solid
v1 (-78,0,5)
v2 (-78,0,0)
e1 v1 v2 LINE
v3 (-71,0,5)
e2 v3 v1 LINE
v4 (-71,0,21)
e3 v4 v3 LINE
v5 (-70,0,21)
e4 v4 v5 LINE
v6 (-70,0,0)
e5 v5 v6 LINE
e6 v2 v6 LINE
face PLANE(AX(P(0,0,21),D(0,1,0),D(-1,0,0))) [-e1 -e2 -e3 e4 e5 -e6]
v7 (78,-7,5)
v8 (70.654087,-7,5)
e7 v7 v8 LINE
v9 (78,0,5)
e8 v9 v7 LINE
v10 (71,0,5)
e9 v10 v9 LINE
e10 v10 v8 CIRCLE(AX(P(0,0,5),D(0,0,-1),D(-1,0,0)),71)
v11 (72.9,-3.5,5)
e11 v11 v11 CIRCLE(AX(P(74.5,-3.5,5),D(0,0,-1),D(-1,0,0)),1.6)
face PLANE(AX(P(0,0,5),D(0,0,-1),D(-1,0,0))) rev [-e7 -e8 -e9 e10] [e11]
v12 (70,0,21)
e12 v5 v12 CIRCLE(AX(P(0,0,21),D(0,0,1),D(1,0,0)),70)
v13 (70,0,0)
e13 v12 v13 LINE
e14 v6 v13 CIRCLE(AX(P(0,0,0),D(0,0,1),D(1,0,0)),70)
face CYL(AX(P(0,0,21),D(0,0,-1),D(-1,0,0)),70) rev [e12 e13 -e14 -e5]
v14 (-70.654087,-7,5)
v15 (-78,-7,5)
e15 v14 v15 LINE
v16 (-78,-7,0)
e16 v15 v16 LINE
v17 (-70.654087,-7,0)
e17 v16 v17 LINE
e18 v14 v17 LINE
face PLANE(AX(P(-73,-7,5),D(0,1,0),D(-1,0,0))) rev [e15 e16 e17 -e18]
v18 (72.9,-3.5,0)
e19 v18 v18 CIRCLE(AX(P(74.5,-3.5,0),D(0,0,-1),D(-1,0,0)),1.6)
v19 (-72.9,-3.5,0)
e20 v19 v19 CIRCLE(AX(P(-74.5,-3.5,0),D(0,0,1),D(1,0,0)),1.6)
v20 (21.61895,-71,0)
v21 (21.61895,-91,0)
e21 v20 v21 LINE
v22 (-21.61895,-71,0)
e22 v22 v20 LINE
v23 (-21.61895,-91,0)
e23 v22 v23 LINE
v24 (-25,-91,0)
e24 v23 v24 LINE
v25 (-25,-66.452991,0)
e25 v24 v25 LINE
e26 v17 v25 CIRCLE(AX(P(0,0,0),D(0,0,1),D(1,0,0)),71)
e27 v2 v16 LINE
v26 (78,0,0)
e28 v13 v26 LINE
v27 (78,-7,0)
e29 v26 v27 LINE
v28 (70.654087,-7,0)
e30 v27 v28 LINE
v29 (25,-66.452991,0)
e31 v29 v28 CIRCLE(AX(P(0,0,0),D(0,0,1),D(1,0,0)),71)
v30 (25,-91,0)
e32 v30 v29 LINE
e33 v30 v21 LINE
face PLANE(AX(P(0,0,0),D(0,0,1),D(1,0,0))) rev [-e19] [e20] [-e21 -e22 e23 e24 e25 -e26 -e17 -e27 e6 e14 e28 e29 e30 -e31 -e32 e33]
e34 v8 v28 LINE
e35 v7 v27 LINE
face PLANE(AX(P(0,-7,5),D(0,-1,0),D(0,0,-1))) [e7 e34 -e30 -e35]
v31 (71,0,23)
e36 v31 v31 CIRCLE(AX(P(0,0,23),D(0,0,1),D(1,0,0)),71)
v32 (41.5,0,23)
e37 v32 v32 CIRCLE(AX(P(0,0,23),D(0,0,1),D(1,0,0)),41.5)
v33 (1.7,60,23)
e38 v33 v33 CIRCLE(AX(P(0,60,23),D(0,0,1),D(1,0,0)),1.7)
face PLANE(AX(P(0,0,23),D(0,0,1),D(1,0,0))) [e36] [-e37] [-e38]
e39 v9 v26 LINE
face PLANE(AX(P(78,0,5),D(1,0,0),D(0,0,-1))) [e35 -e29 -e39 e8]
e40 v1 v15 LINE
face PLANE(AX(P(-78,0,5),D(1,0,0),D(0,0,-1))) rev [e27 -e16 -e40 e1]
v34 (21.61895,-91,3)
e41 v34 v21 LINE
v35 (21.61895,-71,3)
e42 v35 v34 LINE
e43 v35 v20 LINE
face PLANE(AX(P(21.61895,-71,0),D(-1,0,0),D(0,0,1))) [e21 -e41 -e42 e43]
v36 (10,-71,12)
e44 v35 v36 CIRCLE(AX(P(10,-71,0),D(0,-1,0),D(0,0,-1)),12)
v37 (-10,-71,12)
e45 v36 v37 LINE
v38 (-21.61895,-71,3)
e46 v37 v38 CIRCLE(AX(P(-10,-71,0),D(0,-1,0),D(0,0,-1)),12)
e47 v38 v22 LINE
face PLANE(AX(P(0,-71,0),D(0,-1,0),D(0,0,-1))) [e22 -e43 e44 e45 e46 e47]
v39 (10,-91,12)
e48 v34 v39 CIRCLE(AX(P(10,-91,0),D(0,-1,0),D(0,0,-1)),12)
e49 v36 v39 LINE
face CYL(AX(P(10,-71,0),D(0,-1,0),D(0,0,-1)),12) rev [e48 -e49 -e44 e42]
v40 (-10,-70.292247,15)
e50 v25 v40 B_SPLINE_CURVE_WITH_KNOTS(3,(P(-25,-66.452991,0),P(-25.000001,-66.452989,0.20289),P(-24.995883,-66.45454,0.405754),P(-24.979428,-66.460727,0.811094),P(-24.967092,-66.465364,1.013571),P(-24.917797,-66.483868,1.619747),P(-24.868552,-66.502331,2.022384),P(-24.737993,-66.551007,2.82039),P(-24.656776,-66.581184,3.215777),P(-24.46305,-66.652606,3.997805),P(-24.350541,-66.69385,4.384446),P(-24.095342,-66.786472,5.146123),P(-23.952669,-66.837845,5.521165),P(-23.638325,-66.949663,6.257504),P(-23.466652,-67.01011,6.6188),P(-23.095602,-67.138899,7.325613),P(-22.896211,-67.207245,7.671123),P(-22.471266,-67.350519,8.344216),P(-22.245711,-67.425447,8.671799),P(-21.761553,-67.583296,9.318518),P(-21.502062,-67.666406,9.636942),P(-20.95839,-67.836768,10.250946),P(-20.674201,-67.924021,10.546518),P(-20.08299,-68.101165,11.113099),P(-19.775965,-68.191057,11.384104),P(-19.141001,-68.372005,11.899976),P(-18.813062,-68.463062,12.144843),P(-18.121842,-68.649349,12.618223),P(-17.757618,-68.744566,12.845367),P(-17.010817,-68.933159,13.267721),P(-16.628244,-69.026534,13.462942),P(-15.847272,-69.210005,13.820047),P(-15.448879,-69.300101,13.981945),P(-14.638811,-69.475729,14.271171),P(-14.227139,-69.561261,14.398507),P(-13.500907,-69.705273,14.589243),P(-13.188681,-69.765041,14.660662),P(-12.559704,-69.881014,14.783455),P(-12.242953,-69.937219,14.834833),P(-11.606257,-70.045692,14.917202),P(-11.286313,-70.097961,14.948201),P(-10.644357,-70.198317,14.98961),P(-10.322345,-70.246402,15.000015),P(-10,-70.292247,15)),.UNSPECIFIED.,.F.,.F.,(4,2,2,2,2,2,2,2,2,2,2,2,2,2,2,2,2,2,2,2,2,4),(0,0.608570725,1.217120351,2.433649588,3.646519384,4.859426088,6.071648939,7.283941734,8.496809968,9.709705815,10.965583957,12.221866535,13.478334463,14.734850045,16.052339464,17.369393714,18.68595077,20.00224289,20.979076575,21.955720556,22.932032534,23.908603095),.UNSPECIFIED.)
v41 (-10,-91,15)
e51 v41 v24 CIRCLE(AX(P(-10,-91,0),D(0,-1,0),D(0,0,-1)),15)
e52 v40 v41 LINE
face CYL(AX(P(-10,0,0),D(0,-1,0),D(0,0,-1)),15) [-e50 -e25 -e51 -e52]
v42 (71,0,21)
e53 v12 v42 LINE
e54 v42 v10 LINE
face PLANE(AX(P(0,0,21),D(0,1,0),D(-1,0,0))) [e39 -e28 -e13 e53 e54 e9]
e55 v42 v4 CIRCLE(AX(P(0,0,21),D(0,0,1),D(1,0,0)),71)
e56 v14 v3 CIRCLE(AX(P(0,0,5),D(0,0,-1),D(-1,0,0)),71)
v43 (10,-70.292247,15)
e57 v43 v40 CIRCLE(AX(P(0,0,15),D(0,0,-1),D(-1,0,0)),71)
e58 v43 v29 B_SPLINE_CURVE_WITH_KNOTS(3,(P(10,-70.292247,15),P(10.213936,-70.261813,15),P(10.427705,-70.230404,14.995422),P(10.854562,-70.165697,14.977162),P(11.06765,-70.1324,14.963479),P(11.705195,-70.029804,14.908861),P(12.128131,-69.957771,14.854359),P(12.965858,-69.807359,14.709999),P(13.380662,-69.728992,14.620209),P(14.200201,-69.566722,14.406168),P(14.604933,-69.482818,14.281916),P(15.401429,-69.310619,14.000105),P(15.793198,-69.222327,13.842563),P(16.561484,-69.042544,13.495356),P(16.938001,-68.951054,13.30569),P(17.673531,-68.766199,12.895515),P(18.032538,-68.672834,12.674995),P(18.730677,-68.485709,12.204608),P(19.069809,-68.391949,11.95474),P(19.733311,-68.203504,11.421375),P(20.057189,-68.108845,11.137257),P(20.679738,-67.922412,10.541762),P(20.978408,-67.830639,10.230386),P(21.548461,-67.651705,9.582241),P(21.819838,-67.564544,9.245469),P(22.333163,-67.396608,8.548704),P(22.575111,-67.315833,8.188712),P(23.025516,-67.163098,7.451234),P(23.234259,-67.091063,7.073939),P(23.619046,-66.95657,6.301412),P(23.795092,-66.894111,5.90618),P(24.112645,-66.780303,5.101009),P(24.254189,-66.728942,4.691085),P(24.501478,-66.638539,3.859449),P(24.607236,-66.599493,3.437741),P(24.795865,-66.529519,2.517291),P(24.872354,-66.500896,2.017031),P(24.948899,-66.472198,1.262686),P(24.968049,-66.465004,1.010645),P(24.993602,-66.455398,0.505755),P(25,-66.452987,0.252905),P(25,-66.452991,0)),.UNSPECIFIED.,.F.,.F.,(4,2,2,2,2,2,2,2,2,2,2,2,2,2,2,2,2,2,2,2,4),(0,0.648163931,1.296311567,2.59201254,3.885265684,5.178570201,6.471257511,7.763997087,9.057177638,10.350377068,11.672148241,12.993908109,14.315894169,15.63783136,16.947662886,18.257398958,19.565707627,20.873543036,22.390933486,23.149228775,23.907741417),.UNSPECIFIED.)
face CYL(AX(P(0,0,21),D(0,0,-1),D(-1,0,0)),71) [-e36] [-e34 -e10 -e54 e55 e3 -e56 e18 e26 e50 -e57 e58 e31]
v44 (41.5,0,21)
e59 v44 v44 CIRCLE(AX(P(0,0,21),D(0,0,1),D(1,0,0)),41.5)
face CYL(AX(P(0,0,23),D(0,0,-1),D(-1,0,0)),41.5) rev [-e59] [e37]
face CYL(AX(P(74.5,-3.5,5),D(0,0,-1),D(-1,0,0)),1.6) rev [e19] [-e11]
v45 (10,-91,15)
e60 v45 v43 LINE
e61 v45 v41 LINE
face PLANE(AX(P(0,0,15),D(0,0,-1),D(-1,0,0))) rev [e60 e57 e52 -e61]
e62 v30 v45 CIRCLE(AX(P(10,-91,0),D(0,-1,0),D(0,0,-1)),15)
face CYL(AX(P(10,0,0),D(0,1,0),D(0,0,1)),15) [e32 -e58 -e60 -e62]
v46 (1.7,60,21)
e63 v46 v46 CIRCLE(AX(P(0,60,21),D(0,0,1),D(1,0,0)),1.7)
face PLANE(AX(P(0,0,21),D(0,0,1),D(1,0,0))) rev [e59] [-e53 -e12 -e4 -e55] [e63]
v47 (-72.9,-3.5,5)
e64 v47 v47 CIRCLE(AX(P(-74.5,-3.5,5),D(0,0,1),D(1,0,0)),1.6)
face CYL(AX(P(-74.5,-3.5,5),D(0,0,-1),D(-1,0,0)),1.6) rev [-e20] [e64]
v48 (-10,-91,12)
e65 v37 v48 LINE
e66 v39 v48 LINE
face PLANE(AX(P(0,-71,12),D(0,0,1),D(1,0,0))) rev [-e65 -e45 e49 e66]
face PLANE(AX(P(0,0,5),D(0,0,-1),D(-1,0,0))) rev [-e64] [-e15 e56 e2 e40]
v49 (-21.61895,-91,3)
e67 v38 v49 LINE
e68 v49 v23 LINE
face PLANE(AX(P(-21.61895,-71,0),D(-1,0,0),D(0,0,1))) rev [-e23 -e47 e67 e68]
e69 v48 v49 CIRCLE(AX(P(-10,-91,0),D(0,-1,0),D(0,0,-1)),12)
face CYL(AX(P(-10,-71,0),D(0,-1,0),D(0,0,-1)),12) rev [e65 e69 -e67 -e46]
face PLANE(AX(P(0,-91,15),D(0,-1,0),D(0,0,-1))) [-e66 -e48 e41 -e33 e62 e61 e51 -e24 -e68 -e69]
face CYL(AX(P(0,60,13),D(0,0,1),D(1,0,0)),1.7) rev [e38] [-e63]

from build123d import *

# Parameters (mm, degrees)
BOSS_EXTRUDE1_DEPTH = 21
SKETCH2_R           = 71
SKETCH2_R_2         = 41.5
BOSS_EXTRUDE2_DEPTH = 2
SKETCH3_W           = 50
SKETCH3_H           = 20
BOSS_EXTRUDE3_DEPTH = 15
SKETCH8_R           = 1.6
BOSS_EXTRUDE5_DEPTH = 5
FILLET2_R           = 15
SKETCH11_W          = 43.237900078
SKETCH11_H          = 3
CUT_EXTRUDE7_DEPTH  = 20
SKETCH12_R          = 1.7
CUT_EXTRUDE8_DEPTH  = 10


with BuildPart() as part:
    # Sketch1 → Boss-Extrude1 (new body)
    with BuildSketch(Plane.XY):
        with BuildLine():
            Line((71, 0), (70, 0))
            ThreePointArc((70, 0), (0, -70), (-70, 0))
            Line((-70, 0), (-71, 0))
            ThreePointArc((-71, 0), (0, -71), (71, 0))
        make_face()
    extrude(amount=BOSS_EXTRUDE1_DEPTH)

    # Sketch2 → Boss-Extrude2 (add)
    with BuildSketch(Plane.XY.offset(21)):
        Circle(SKETCH2_R)
        Circle(SKETCH2_R_2, mode=Mode.SUBTRACT)
    extrude(amount=BOSS_EXTRUDE2_DEPTH)

    # Sketch3 → Boss-Extrude3 (add)
    with BuildSketch(Plane(origin=(0, 0, 0), x_dir=(-1, 0, 0), z_dir=(0, 0, -1))):
        with BuildLine():
            Line((-25, -66.452990903), (-25, -71))
            Line((-25, -71), (0, -71))
            ThreePointArc((0, -71), (-12.705070757, -69.853999006), (-25, -66.452990903))
        make_face()
        with BuildLine():
            ThreePointArc((25, -66.452990903), (12.705070757, -69.853999006), (0, -71))
            Line((0, -71), (25, -71))
            Line((25, -71), (25, -66.452990903))
        make_face()
        with Locations((0, -81)):
            Rectangle(SKETCH3_W, SKETCH3_H)
    extrude(amount=-BOSS_EXTRUDE3_DEPTH)

    # Sketch8 → Boss-Extrude5 (add)
    # profile 1 of 2: a face of its own
    with BuildSketch(Plane(origin=(0, 0, 0), x_dir=(-1, 0, 0), z_dir=(0, 0, -1))):
        with BuildLine():
            ThreePointArc((-70.654086931, -7), (-70.913469003, -3.504270818), (-71, 0))
            Line((-71, 0), (-78, 0))
            Line((-78, 0), (-78, -7))
            Line((-78, -7), (-70.654086931, -7))
        make_face()
        with Locations((-74.5, -3.5)):
            Circle(SKETCH8_R, mode=Mode.SUBTRACT)
    # profile 2 of 2: a face of its own
    with BuildSketch(Plane(origin=(0, 0, 0), x_dir=(-1, 0, 0), z_dir=(0, 0, -1))):
        with BuildLine():
            Line((78, 0), (71, 0))
            ThreePointArc((71, 0), (70.913469003, -3.504270818), (70.654086931, -7))
            Line((70.654086931, -7), (78, -7))
            Line((78, -7), (78, 0))
        make_face()
        with Locations(Location((74.5, -3.5, 0), (0, 0, 180))):
            Circle(SKETCH8_R, mode=Mode.SUBTRACT)
    extrude(amount=-BOSS_EXTRUDE5_DEPTH)

    # Fillet2
    fillet2_edges = [part.edges().sort_by_distance(p)[0] for p in [
        (-25, -78.726495452, 15),
        (25, -78.726495452, 15),
    ]]
    fillet(fillet2_edges, radius=FILLET2_R - 0.0001)  # a hair under: the kernel refuses the full size

    # Sketch11 → Cut-Extrude7 (cut)
    with BuildSketch(Plane.XZ.offset(91)):
        with Locations((0, 1.5)):
            Rectangle(SKETCH11_W, SKETCH11_H)
        with BuildLine():
            Line((-21.618950039, 3), (21.618950039, 3))
            ThreePointArc((21.618950039, 3), (17.348469228, 9.486832981), (10, 12))
            Line((10, 12), (-10, 12))
            ThreePointArc((-10, 12), (-17.348469228, 9.486832981), (-21.618950039, 3))
        make_face()
    extrude(amount=-CUT_EXTRUDE7_DEPTH, mode=Mode.SUBTRACT)

    # Sketch12 → Cut-Extrude8 (cut)
    with BuildSketch(Plane.XY.offset(23)):
        with Locations((0, 60)):
            Circle(SKETCH12_R)
    extrude(amount=-CUT_EXTRUDE8_DEPTH, mode=Mode.SUBTRACT)


solid = part.part
